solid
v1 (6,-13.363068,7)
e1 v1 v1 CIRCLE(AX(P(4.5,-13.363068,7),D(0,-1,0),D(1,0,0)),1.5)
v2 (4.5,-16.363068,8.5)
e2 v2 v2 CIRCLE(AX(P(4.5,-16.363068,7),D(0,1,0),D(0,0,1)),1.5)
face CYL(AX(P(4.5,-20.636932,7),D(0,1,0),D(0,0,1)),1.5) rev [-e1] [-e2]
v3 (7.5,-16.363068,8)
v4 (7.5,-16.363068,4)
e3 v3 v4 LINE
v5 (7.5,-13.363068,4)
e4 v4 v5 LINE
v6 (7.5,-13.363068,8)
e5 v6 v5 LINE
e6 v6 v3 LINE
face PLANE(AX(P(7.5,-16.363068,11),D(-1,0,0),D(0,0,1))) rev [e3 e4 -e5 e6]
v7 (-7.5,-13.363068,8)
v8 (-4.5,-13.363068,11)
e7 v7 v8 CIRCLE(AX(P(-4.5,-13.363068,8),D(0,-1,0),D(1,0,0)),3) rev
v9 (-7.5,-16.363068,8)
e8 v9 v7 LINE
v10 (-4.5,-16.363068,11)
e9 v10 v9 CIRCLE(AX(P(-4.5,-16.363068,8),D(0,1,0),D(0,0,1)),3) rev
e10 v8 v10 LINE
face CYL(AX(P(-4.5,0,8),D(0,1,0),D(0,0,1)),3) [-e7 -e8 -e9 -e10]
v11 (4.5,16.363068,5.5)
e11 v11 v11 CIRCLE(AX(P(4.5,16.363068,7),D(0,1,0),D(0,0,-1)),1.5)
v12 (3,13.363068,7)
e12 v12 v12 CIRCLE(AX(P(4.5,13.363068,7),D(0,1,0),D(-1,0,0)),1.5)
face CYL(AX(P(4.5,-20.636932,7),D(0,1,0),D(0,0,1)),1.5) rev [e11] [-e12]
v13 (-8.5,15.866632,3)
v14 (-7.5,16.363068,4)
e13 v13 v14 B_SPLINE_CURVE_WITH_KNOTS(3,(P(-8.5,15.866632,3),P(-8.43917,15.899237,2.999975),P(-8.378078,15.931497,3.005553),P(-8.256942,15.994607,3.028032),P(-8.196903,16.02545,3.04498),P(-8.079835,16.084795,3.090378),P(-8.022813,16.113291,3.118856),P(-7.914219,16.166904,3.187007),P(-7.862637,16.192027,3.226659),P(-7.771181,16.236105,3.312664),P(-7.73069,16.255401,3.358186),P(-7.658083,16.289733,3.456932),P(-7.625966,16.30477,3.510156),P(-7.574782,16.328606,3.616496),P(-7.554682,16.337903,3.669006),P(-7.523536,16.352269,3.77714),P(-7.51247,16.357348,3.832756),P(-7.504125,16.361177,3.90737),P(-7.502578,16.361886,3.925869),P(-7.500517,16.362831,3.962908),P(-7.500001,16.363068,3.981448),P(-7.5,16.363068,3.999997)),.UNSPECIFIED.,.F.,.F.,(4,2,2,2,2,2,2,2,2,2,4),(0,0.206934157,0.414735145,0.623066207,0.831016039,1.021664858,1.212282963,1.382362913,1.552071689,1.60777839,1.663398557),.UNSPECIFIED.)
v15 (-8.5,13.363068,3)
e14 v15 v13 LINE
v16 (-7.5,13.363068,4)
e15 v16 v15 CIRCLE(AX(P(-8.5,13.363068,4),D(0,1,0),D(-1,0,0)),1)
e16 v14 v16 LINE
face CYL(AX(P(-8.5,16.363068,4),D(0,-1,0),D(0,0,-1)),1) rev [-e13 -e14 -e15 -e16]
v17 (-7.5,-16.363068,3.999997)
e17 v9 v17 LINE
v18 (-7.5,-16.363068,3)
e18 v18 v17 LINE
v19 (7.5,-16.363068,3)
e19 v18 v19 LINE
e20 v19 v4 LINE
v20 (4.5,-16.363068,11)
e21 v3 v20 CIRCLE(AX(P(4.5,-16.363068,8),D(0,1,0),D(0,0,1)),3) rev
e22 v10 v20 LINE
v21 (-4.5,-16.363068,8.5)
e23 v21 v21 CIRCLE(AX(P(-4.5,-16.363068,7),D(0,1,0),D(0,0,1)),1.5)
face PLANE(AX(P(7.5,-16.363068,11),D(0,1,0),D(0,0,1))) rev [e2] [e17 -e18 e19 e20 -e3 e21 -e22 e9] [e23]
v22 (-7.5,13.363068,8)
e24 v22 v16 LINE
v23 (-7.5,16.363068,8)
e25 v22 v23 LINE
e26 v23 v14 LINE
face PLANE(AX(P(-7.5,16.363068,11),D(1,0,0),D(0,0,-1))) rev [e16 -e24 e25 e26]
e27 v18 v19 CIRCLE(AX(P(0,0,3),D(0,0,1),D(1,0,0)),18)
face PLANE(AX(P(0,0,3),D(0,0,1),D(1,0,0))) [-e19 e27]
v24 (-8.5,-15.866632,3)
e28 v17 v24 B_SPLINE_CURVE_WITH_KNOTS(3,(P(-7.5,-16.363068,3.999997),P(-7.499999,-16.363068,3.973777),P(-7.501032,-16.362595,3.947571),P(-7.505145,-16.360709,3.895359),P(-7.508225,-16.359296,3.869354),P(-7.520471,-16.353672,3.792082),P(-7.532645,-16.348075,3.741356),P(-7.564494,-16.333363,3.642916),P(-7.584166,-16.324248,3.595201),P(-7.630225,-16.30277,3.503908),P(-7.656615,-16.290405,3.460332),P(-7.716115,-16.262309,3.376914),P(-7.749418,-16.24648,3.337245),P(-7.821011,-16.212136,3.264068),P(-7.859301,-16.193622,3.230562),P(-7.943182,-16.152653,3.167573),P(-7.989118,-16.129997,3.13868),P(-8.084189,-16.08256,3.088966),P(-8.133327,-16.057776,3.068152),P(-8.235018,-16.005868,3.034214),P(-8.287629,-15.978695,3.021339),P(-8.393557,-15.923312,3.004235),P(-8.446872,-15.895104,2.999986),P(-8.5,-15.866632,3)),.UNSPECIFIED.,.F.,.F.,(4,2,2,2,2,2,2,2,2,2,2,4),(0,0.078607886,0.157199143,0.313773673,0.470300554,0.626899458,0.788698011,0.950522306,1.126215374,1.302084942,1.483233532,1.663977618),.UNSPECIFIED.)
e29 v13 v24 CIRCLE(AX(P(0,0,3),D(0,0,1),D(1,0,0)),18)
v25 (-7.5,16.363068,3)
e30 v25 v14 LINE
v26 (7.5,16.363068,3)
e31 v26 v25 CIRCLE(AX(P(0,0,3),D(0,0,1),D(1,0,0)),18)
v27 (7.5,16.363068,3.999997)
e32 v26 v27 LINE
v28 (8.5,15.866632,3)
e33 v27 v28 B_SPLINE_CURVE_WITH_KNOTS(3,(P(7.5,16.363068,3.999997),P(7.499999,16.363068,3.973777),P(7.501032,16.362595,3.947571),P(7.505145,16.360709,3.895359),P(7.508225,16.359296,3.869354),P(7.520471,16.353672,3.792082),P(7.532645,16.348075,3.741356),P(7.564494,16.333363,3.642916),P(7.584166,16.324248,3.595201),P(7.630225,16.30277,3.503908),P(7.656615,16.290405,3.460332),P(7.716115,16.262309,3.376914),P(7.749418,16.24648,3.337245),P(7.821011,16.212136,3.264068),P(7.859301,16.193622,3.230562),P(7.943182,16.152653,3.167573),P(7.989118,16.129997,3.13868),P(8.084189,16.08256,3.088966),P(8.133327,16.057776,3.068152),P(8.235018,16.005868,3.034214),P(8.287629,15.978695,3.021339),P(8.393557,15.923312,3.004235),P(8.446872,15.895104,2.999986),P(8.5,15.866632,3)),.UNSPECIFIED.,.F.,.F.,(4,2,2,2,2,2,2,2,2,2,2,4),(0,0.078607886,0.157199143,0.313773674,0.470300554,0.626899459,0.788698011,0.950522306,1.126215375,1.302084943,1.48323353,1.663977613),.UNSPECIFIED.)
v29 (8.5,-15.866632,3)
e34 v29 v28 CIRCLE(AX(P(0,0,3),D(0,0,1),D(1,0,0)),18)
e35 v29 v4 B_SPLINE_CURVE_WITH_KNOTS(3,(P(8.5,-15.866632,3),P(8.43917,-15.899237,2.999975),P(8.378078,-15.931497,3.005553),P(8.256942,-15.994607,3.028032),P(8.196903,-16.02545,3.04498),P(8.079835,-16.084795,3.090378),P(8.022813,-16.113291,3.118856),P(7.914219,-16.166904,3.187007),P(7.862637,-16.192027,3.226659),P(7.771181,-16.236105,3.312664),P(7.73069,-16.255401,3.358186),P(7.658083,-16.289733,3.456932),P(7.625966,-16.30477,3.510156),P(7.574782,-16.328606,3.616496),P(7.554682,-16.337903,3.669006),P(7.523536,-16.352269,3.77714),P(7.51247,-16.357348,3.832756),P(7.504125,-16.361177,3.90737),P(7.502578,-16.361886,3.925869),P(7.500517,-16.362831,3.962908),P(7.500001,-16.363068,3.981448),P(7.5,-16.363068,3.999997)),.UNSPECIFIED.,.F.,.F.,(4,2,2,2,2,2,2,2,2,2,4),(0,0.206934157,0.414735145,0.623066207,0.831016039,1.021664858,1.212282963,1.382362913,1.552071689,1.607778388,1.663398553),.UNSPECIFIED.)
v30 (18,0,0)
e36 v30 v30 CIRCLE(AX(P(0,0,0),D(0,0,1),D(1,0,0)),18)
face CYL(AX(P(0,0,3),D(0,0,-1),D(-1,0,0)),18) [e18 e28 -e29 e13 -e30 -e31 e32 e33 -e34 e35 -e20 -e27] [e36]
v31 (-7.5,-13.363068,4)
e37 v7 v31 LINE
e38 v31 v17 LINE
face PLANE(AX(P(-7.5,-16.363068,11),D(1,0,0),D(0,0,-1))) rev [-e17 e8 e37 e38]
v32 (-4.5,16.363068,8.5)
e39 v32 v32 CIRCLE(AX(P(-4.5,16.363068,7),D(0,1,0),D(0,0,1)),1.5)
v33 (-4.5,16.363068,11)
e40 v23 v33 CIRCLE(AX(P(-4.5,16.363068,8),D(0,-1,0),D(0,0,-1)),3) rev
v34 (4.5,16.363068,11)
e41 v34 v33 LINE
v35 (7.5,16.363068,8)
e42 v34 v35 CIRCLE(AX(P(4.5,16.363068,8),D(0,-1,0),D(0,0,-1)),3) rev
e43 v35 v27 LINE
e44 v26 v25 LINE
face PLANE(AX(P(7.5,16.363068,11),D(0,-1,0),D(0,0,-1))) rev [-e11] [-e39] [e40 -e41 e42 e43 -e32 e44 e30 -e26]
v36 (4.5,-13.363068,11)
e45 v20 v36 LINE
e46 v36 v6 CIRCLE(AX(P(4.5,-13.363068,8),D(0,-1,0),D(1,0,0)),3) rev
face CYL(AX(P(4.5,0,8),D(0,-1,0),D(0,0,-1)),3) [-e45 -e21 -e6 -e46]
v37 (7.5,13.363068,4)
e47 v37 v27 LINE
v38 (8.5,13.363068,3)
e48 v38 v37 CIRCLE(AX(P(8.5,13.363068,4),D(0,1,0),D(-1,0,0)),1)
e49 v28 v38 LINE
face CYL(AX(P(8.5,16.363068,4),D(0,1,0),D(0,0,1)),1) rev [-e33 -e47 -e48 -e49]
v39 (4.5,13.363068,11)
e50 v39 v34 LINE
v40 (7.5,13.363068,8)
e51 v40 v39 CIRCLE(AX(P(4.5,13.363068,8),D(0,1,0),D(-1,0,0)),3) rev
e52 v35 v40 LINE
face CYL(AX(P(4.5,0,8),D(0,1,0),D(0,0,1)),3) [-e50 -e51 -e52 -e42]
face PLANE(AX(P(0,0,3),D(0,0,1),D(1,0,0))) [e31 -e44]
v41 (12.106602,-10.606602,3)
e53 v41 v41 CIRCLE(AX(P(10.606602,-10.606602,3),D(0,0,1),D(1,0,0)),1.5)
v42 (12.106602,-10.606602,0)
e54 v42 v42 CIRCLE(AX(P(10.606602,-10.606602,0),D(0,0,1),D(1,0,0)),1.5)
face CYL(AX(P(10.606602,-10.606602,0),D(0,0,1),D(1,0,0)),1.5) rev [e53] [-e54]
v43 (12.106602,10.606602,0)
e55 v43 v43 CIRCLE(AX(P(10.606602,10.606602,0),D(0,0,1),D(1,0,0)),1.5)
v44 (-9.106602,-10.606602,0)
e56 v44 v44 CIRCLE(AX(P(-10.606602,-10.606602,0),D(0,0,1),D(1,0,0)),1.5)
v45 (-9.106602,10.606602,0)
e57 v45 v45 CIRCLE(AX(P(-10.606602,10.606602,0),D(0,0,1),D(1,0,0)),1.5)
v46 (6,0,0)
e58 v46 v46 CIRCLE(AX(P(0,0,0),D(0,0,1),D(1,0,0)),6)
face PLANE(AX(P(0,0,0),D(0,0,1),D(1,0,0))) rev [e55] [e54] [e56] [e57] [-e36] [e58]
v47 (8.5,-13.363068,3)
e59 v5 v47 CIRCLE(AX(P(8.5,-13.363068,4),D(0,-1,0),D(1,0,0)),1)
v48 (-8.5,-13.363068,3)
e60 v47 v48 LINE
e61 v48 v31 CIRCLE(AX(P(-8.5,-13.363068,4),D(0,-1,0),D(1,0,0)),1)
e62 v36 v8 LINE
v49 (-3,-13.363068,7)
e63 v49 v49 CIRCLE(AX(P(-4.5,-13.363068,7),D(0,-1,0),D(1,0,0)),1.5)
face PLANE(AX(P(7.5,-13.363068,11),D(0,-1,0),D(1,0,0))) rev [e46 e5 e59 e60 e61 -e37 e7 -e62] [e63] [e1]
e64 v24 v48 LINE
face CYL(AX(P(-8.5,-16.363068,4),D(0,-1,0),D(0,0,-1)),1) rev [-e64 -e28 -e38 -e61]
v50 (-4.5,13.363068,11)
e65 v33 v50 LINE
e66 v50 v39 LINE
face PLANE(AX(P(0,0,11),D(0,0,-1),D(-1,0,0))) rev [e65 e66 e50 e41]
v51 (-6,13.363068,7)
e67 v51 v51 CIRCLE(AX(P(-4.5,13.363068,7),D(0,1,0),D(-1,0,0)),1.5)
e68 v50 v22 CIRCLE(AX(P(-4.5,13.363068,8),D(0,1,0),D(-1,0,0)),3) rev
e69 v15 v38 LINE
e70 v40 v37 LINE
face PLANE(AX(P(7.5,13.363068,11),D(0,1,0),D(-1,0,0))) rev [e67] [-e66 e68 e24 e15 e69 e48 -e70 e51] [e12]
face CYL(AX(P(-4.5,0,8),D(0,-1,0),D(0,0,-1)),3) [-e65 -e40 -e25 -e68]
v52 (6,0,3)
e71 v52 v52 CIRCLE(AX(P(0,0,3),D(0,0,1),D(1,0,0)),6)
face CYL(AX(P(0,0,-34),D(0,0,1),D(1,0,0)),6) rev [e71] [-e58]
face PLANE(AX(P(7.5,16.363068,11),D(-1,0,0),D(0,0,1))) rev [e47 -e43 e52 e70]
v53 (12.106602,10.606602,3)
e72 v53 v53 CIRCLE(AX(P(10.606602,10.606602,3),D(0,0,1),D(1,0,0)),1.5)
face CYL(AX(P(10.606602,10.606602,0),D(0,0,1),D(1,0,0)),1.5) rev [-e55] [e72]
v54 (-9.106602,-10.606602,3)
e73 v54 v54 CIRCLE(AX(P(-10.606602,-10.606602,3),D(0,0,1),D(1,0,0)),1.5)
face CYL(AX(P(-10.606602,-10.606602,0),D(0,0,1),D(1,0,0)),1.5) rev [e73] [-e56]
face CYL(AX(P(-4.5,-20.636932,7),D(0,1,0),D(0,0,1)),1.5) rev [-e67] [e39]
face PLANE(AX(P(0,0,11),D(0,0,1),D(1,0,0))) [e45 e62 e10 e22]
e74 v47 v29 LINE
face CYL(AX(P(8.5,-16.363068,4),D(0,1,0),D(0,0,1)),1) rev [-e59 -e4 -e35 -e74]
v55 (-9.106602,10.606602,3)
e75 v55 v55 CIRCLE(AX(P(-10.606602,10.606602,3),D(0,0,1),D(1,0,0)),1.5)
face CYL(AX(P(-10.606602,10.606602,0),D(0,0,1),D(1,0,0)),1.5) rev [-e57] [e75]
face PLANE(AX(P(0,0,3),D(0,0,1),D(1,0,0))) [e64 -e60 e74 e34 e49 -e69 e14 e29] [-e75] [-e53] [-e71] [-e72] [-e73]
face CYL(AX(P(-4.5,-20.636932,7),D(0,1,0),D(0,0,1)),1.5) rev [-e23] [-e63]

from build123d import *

# Parameters (mm, degrees)
SKETCH_1_R          = 18
EXTRUDE_1_DEPTH     = 3
SKETCH_2_R          = 1.5
CUT_EXTRUDE_1_DEPTH = 3
SKETCH_4_W          = 15
SKETCH_4_H          = 3
EXTRUDE_2_DEPTH     = 8
SKETCH_5_R          = 1.5
CUT_EXTRUDE_2_DEPTH = 37
FILLET_1_R          = 3
FILLET_2_R          = 1
SKETCH_6_R          = 6
CUT_EXTRUDE_3_DEPTH = 37


with BuildPart() as part:
    # Эскиз1 → Бобышка-Вытянуть1 (new body)
    with BuildSketch(Plane.XY):
        Circle(SKETCH_1_R)
    extrude(amount=EXTRUDE_1_DEPTH)

    # Эскиз2 → Вырез-Вытянуть1 (cut)
    with BuildSketch(Plane.XY.offset(3)):
        with Locations((-10.606601718, -10.606601718)):
            Circle(SKETCH_2_R)
        with Locations((10.606601718, -10.606601718)):
            Circle(SKETCH_2_R)
        with Locations((10.606601718, 10.606601718)):
            Circle(SKETCH_2_R)
        with Locations((-10.606601718, 10.606601718)):
            Circle(SKETCH_2_R)
    extrude(amount=-CUT_EXTRUDE_1_DEPTH, mode=Mode.SUBTRACT)

    # Эскиз4 → Бобышка-Вытянуть2 (add)
    with BuildSketch(Plane.XY.offset(3)):
        with Locations((0, 14.863068172)):
            Rectangle(SKETCH_4_W, SKETCH_4_H)
        with Locations((0, -14.863068172)):
            Rectangle(SKETCH_4_W, SKETCH_4_H)
    extrude(amount=EXTRUDE_2_DEPTH)

    # Эскиз5 → Вырез-Вытянуть2 (cut)
    with BuildSketch(Plane(origin=(0, 16.363068172, 0), x_dir=(1, 0, 0), z_dir=(0, 1, 0))):
        with Locations(Location((-4.5, -7, 0), (0, 0, 270))):
            Circle(SKETCH_5_R)
        with Locations(Location((4.5, -7, 0), (0, 0, 270))):
            Circle(SKETCH_5_R)
    extrude(amount=-CUT_EXTRUDE_2_DEPTH, mode=Mode.SUBTRACT)

    # Скругление1
    fillet_1_edges = [part.edges().sort_by_distance(p)[0] for p in [
        (-7.5, 14.863068172, 11),
        (7.5, 14.863068172, 11),
        (7.5, -14.863068172, 11),
        (-7.5, -14.863068172, 11),
    ]]
    fillet(fillet_1_edges, radius=FILLET_1_R)

    # Скругление2
    # the kernel refuses this fillet: 1 mm, written as the material it adds along each edge
    with BuildSketch(Plane(origin=(-7.5, 16.363068172, 3), x_dir=(-1, 0, 0), z_dir=(0, -1, 0))) as fillet_2_piece_1_section:
        with BuildLine():
            CenterArc((FILLET_2_R, -FILLET_2_R), FILLET_2_R, 90, 90)
            Line((0, -FILLET_2_R), (0, 0))
            Line((0, 0), (FILLET_2_R, 0))
        make_face()
    fillet_2_piece_1 = extrude(amount=3, mode=Mode.PRIVATE)
    fillet_2_piece_1 = fillet_2_piece_1 & Plane(origin=(0, 0, 3.230923565), x_dir=(1, 0, 0), z_dir=(0, 0, -1)) * Cylinder(18, 11, mode=Mode.PRIVATE)
    add(fillet_2_piece_1)
    with BuildSketch(Plane(origin=(7.5, 13.363068172, 3), x_dir=(1, 0, 0), z_dir=(0, 1, 0))) as fillet_2_piece_2_section:
        with BuildLine():
            CenterArc((FILLET_2_R, -FILLET_2_R), FILLET_2_R, 90, 90)
            Line((0, -FILLET_2_R), (0, 0))
            Line((0, 0), (FILLET_2_R, 0))
        make_face()
    fillet_2_piece_2 = extrude(amount=3, mode=Mode.PRIVATE)
    fillet_2_piece_2 = fillet_2_piece_2 & Plane(origin=(0, 0, 3.230923565), x_dir=(1, 0, 0), z_dir=(0, 0, -1)) * Cylinder(18, 10, mode=Mode.PRIVATE)
    add(fillet_2_piece_2)
    with BuildSketch(Plane(origin=(7.5, -16.363068172, 3), x_dir=(0, 0, 1), z_dir=(0, 1, 0))) as fillet_2_piece_3_section:
        with BuildLine():
            CenterArc((FILLET_2_R, FILLET_2_R), FILLET_2_R, 180, 90)
            Line((0, FILLET_2_R), (0, 0))
            Line((0, 0), (FILLET_2_R, 0))
        make_face()
    fillet_2_piece_3 = extrude(amount=3, mode=Mode.PRIVATE)
    fillet_2_piece_3 = fillet_2_piece_3 & Plane(origin=(0, 0, 3.230923542), x_dir=(1, 0, 0), z_dir=(0, 0, -1)) * Cylinder(18, 10, mode=Mode.PRIVATE)
    add(fillet_2_piece_3)
    with BuildSketch(Plane(origin=(-7.5, -13.363068172, 3), x_dir=(-1, 0, 0), z_dir=(0, -1, 0))) as fillet_2_piece_4_section:
        with BuildLine():
            CenterArc((FILLET_2_R, -FILLET_2_R), FILLET_2_R, 90, 90)
            Line((0, -FILLET_2_R), (0, 0))
            Line((0, 0), (FILLET_2_R, 0))
        make_face()
    fillet_2_piece_4 = extrude(amount=3, mode=Mode.PRIVATE)
    fillet_2_piece_4 = fillet_2_piece_4 & Plane(origin=(0, 0, 3.230923565), x_dir=(1, 0, 0), z_dir=(0, 0, -1)) * Cylinder(18, 11, mode=Mode.PRIVATE)
    add(fillet_2_piece_4)

    # Эскиз6 → Вырез-Вытянуть3 (cut)
    with BuildSketch(Plane.XY.offset(3)):
        Circle(SKETCH_6_R)
    extrude(amount=-CUT_EXTRUDE_3_DEPTH, mode=Mode.SUBTRACT)


solid = part.part
